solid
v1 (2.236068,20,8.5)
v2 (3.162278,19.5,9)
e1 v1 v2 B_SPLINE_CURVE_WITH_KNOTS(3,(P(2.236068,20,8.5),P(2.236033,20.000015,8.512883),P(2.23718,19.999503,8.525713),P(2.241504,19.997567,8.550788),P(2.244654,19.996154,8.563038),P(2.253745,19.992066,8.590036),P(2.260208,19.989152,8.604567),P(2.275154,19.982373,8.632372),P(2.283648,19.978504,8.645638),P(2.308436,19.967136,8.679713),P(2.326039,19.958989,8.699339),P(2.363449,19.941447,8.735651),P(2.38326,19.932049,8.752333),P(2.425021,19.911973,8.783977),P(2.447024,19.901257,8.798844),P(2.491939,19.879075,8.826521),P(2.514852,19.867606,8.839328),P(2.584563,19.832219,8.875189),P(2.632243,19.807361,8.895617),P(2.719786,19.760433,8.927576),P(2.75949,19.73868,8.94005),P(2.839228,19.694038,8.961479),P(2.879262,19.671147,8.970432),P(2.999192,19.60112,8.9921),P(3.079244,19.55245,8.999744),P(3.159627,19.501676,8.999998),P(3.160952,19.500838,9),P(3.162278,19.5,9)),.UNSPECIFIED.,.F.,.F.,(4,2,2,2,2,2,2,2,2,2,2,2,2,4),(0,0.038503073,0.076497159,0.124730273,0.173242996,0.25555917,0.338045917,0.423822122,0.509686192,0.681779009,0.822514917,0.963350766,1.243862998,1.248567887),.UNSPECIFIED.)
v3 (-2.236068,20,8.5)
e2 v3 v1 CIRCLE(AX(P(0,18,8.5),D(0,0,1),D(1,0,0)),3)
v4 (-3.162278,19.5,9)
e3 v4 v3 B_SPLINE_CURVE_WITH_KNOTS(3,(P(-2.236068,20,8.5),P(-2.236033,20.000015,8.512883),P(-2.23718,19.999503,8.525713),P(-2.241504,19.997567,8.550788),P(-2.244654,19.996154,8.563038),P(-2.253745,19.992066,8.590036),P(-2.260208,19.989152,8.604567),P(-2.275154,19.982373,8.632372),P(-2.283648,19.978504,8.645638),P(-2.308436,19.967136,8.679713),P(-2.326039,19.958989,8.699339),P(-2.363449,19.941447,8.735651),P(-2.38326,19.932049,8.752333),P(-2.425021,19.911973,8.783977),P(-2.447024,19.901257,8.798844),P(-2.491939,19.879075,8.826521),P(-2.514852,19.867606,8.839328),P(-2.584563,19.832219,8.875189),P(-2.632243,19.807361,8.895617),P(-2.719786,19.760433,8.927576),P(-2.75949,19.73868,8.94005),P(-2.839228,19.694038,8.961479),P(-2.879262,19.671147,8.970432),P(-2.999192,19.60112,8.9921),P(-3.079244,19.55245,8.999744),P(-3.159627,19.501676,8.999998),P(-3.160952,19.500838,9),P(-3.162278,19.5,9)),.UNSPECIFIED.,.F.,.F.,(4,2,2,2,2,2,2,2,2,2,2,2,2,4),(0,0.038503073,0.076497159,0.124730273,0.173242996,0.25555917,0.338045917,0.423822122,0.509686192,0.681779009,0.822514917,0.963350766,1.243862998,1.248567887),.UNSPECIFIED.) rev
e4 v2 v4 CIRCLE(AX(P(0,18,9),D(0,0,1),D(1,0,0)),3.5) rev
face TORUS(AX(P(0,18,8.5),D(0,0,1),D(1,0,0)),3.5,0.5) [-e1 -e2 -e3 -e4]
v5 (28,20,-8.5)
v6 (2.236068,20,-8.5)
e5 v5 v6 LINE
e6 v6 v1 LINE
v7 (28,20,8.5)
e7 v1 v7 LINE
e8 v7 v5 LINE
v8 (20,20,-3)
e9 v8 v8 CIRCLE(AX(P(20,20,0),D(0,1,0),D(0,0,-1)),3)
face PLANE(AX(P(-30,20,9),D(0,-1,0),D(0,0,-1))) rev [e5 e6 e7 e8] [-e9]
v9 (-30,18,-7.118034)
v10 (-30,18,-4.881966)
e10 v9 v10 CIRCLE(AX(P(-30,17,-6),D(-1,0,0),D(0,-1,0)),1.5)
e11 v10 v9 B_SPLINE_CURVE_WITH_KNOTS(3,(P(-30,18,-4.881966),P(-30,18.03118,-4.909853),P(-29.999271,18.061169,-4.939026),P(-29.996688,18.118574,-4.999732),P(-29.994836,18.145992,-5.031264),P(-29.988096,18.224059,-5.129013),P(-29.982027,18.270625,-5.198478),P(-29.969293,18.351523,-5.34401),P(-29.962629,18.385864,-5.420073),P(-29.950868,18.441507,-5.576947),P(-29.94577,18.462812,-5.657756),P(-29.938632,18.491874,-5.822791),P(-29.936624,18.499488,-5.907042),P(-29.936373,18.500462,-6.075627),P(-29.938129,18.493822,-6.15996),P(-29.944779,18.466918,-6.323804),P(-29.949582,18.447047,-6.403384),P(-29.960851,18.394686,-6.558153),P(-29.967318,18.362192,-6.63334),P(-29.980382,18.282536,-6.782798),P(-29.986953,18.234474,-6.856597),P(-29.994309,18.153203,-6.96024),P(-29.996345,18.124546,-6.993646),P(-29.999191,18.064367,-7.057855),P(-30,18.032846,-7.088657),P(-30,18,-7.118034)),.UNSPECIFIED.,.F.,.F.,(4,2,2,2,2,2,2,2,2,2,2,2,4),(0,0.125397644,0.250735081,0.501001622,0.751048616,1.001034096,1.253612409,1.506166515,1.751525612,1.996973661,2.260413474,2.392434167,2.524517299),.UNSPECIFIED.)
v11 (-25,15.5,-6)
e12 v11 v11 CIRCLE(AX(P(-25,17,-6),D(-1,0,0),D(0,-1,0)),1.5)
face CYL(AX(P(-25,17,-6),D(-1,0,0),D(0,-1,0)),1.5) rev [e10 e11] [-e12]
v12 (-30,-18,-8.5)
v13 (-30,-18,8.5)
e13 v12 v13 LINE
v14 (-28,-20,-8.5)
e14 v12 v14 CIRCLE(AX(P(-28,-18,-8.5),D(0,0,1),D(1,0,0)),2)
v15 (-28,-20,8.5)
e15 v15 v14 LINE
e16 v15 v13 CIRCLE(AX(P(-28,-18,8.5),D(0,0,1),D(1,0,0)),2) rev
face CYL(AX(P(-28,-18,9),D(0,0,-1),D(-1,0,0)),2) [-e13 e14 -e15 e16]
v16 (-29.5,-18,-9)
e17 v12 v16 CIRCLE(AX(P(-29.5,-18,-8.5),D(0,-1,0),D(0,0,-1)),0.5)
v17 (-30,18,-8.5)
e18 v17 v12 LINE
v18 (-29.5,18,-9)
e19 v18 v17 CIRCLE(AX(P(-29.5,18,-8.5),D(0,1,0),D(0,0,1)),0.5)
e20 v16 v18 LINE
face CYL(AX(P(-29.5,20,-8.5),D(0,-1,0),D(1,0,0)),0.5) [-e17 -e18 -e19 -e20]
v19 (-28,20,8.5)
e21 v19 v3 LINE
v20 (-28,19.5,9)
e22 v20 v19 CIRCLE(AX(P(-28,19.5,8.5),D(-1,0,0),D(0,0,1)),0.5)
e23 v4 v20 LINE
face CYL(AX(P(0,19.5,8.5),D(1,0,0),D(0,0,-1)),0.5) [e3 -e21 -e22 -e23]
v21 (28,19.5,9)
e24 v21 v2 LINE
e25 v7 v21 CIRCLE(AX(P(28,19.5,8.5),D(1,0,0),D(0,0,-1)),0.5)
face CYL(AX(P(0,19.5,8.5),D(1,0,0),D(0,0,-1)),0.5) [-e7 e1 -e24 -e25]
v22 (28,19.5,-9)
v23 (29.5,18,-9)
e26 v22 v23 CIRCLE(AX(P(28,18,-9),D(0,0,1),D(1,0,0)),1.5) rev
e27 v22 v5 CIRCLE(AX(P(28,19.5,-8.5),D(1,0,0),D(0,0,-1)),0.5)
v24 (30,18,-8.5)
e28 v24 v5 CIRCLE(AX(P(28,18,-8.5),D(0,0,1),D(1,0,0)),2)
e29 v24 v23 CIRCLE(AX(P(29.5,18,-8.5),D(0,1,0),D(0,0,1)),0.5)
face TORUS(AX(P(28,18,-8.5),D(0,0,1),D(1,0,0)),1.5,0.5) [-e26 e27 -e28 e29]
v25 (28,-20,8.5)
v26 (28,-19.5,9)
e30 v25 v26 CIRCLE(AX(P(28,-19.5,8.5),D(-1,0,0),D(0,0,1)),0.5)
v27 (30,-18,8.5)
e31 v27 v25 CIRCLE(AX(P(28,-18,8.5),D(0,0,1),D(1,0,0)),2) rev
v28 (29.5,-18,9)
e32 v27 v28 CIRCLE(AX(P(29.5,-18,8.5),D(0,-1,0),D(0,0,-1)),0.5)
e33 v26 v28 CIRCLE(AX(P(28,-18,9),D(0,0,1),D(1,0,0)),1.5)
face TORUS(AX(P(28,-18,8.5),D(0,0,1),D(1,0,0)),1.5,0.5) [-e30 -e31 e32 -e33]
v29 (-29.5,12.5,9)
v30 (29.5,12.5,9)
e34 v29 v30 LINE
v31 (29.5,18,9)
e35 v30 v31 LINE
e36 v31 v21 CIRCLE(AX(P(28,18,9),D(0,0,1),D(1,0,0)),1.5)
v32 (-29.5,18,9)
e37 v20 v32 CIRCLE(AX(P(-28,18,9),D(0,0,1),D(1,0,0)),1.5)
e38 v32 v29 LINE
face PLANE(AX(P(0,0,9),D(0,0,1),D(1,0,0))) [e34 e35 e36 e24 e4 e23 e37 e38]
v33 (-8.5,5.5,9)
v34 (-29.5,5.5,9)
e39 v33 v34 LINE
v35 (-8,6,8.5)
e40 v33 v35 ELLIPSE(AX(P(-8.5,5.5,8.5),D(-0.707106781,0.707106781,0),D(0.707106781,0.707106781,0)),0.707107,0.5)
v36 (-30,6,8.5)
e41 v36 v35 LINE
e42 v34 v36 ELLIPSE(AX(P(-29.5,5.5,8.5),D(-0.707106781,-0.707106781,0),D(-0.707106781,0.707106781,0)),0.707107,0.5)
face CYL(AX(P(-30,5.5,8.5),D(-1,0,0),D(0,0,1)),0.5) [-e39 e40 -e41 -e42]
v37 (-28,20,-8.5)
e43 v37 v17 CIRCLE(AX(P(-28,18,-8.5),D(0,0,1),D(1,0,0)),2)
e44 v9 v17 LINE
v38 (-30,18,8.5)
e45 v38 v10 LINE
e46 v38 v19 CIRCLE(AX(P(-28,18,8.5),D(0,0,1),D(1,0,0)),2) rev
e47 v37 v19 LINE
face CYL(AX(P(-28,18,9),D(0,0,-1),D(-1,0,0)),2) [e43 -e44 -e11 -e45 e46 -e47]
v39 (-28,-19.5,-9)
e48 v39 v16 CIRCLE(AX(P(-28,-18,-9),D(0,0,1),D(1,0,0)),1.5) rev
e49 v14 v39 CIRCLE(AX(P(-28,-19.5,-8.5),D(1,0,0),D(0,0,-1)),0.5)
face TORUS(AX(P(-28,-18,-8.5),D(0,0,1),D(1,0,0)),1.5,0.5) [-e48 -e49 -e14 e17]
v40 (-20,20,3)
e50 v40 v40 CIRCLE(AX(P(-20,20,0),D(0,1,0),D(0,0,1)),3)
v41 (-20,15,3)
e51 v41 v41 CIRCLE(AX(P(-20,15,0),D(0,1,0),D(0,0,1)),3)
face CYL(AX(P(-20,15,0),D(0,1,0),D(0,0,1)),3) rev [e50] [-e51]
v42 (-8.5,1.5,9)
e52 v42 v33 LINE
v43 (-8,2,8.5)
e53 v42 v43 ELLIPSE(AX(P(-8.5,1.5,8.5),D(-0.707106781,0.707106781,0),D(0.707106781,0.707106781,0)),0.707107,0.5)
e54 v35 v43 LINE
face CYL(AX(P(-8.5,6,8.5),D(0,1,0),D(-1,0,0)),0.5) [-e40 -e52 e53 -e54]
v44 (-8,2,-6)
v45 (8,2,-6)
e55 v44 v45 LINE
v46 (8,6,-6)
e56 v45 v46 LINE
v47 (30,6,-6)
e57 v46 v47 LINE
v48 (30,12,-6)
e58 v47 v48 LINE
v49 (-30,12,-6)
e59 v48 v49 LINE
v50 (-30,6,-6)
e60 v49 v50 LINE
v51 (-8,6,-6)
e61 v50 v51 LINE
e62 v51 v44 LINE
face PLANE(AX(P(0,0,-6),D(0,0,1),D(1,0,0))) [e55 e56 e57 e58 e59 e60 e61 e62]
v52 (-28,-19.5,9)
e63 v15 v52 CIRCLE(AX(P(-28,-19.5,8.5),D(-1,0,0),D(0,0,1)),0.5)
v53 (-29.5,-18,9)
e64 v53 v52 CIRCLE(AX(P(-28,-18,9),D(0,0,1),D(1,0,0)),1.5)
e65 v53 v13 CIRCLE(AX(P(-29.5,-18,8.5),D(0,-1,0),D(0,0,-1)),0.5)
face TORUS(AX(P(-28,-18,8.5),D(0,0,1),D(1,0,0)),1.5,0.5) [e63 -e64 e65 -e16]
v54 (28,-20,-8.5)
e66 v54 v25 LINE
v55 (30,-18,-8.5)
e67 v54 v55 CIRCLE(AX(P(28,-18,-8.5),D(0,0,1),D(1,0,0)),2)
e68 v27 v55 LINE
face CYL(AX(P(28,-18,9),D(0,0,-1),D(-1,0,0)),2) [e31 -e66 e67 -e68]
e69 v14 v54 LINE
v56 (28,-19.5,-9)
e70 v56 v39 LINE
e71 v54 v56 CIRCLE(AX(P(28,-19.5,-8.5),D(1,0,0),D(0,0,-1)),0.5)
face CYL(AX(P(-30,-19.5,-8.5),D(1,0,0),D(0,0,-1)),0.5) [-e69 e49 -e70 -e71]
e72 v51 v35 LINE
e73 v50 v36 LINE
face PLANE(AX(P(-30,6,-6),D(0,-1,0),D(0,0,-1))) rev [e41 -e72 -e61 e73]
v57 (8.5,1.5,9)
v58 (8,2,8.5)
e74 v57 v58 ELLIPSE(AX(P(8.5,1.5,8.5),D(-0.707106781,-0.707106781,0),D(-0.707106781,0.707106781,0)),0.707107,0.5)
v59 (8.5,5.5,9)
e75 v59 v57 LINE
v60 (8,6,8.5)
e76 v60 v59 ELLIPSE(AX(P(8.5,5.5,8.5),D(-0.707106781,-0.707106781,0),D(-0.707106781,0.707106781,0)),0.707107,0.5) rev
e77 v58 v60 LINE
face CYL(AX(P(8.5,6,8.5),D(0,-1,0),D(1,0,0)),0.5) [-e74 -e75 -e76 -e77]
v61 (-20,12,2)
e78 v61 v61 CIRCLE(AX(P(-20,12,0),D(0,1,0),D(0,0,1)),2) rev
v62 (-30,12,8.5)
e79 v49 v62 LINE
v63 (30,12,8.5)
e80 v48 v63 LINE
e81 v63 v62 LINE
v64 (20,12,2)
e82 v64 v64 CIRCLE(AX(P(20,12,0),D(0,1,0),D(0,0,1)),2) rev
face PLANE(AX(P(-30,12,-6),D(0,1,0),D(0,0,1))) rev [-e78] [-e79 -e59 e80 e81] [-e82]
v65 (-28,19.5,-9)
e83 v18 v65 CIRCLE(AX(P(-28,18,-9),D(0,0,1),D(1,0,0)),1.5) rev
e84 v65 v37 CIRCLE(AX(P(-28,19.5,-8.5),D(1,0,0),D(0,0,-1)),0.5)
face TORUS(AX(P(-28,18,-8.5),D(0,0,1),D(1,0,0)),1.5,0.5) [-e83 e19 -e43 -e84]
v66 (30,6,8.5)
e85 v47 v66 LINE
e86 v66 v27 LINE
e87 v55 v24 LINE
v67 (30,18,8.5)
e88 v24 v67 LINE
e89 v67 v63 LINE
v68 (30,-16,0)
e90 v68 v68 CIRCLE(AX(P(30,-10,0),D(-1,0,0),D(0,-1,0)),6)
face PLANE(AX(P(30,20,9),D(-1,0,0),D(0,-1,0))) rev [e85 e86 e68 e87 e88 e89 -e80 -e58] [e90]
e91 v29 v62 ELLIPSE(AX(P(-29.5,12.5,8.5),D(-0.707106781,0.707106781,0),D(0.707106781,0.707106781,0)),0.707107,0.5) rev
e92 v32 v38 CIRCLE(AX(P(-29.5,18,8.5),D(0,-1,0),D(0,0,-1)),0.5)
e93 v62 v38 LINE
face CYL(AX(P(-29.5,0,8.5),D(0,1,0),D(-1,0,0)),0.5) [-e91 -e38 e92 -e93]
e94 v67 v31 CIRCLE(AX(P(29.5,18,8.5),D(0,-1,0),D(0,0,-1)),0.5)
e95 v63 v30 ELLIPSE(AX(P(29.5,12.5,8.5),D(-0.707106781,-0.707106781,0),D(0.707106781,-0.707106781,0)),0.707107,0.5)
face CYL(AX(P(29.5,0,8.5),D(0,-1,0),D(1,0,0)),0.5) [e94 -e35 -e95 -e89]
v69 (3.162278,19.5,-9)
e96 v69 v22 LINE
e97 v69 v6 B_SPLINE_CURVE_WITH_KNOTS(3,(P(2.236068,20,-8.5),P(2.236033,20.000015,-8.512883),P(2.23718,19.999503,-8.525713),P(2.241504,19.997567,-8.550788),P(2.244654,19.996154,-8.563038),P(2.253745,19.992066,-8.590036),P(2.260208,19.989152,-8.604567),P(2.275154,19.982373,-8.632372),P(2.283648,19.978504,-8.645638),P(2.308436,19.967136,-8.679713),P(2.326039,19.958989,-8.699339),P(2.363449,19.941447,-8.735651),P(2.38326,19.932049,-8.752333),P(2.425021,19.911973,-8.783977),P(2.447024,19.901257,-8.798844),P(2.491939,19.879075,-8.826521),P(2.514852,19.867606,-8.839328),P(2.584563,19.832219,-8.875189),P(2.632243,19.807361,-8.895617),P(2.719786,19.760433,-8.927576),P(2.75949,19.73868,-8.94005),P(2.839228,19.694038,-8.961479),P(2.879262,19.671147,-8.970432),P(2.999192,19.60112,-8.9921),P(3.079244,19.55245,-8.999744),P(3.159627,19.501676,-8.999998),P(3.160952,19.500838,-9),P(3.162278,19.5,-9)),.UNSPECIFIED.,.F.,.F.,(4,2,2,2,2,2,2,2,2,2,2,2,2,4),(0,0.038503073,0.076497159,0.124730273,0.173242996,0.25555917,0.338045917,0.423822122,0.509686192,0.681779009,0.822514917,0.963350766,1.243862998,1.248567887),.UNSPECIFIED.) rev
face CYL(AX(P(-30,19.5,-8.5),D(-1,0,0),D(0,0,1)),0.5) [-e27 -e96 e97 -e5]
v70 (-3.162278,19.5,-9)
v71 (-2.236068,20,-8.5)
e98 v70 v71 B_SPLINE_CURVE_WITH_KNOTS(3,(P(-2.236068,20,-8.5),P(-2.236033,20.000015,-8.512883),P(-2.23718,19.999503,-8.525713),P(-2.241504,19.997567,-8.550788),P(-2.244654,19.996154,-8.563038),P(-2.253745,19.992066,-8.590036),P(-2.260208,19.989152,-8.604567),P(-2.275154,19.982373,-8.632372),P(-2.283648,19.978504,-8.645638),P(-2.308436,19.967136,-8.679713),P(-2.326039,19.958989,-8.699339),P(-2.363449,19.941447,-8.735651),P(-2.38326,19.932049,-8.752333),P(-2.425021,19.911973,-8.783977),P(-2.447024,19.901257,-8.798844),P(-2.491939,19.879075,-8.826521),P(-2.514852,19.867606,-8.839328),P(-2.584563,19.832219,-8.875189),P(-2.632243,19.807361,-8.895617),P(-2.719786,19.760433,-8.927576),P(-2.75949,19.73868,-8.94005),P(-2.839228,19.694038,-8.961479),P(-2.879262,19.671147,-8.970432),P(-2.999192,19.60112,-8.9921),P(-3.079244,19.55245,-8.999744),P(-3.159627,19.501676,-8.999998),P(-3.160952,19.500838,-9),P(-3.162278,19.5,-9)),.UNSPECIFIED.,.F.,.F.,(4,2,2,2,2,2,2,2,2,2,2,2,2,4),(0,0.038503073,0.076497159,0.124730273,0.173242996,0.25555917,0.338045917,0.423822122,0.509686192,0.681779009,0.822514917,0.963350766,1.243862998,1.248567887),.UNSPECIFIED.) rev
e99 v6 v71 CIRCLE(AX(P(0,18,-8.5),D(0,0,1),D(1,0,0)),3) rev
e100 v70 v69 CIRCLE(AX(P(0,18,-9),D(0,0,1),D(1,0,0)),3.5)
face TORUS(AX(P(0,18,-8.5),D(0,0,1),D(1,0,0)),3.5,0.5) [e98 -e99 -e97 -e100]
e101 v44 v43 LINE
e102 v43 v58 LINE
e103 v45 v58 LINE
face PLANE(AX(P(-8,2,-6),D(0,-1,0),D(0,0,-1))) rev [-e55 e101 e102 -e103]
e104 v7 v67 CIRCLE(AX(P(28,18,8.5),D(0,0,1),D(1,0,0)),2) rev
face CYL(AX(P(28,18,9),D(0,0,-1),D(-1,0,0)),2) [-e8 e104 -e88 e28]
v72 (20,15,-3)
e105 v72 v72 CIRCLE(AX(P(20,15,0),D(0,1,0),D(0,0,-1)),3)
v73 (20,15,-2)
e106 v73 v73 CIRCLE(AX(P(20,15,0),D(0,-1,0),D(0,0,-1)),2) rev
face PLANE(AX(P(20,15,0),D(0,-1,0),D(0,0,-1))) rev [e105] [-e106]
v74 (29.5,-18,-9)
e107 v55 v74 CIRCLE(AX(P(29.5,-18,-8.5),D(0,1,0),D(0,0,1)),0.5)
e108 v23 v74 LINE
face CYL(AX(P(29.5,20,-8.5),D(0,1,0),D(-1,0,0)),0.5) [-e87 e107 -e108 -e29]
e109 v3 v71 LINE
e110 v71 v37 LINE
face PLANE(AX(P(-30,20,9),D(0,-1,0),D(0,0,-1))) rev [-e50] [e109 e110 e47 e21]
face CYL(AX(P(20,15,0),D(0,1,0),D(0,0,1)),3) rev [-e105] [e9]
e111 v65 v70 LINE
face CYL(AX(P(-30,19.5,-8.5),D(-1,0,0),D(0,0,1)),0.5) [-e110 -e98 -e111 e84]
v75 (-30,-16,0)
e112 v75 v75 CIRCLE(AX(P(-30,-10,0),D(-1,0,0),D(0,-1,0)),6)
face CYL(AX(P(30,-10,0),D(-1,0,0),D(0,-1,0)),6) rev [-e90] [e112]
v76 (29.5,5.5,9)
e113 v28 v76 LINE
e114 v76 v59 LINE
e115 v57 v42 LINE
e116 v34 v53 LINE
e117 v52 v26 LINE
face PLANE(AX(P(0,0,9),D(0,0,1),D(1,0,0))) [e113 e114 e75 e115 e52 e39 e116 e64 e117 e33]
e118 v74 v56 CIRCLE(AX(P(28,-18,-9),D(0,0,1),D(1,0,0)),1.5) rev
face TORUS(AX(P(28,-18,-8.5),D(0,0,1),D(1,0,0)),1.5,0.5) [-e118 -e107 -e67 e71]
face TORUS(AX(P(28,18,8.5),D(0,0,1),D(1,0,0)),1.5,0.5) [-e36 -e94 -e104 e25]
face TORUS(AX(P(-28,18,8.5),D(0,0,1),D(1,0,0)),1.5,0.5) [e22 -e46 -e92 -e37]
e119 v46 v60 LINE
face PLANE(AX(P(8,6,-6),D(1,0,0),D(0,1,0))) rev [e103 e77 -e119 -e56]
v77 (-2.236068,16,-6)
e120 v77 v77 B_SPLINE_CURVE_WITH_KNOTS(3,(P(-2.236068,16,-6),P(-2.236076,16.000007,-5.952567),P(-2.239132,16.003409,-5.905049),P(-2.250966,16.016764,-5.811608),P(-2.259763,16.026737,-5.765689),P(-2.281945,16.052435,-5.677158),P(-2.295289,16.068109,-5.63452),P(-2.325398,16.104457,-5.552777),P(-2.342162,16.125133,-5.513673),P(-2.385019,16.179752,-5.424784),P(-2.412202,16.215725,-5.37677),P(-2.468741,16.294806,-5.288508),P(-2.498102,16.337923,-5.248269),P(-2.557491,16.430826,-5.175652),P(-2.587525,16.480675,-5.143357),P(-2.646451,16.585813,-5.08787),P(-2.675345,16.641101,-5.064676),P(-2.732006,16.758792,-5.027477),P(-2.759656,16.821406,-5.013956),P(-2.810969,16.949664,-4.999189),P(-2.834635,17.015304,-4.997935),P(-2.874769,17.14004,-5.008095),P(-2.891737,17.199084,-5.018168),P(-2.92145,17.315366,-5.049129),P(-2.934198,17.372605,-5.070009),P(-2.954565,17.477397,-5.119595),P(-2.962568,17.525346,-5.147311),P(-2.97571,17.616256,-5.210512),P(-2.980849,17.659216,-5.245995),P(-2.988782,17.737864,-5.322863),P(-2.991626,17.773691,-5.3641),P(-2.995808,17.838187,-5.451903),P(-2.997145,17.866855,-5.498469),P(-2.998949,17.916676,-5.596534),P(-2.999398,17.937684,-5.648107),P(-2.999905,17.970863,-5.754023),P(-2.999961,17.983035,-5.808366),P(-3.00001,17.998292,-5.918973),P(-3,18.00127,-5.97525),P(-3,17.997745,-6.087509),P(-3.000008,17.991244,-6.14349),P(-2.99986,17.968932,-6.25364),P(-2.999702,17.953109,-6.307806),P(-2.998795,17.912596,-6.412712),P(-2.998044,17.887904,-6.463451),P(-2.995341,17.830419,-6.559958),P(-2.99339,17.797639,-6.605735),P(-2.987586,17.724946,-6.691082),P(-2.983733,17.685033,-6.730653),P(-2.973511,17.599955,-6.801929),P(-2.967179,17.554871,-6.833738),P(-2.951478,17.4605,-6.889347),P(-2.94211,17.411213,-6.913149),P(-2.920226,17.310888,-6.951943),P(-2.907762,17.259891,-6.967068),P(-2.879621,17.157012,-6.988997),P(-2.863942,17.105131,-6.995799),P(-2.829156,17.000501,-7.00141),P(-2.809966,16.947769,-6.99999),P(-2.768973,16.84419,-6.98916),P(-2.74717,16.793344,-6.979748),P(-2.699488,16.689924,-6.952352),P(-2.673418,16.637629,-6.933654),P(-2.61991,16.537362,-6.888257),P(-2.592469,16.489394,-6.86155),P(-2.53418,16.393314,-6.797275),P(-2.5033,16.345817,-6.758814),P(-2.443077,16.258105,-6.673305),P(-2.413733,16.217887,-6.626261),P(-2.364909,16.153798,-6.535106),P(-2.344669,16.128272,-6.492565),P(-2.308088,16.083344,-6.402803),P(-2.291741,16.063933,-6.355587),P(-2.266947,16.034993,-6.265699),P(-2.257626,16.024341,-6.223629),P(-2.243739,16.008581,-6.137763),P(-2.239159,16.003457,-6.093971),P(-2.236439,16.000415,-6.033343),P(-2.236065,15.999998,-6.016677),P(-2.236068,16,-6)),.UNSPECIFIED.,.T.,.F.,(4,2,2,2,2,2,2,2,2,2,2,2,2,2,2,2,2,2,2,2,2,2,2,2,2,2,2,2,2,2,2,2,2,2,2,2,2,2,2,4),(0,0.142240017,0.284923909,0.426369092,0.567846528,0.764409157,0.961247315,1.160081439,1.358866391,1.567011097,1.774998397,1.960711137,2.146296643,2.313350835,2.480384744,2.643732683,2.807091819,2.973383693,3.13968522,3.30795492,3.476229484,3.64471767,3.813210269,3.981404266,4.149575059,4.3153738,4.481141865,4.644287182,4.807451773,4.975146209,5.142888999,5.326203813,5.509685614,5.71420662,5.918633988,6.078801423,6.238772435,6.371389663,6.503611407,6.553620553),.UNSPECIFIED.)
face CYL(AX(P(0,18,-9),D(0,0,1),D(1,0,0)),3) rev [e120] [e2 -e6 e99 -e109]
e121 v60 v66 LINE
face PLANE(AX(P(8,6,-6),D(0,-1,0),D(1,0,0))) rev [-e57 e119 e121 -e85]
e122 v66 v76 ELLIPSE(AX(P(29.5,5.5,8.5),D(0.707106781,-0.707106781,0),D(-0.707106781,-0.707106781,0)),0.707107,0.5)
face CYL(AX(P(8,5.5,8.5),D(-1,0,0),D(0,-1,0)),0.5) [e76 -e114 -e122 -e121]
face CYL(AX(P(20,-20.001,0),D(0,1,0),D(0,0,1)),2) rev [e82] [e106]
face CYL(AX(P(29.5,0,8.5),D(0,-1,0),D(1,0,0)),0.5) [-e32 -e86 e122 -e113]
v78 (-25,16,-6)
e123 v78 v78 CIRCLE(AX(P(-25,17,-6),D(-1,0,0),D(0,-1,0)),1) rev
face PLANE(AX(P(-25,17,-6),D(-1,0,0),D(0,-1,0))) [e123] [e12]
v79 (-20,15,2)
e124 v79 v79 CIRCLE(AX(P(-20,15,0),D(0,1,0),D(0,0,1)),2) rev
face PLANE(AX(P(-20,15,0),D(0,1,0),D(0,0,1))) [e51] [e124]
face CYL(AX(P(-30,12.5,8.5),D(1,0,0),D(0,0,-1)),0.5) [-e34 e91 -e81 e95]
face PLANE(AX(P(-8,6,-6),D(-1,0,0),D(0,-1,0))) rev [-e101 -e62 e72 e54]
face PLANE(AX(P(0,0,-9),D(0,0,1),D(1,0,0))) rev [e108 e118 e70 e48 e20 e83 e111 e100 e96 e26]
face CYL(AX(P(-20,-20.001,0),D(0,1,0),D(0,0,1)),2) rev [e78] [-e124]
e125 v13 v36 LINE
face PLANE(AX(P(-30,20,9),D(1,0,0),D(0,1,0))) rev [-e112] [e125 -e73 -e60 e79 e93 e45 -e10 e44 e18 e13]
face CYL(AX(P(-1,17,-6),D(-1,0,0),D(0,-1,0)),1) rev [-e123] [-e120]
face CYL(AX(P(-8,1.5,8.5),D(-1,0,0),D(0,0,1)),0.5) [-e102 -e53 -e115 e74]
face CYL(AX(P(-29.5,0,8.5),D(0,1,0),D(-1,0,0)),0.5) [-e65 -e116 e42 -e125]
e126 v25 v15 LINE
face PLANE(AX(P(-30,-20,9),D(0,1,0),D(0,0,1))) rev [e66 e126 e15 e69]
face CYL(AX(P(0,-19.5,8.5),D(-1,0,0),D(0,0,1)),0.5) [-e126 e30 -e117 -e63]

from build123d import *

# Parameters (mm, degrees)
SKETCH1_W           = 60
SKETCH1_H           = 40
BOSS_EXTRUDE1_DEPTH = 9
SKETCH2_R           = 6
CUT_EXTRUDE1_DEPTH  = 64.882705015
SKETCH3_R           = 3
CUT_EXTRUDE2_DEPTH  = 41.298883359
CUT_EXTRUDE3_DEPTH  = 15
SKETCH5_R           = 1
CUT_EXTRUDE4_DEPTH  = 29
SKETCH6_R           = 1.5
CUT_EXTRUDE5_DEPTH  = 5
CUT_EXTRUDE6_REACH  = 52.804
SKETCH7_R           = 2
SKETCH8_R           = 3
CUT_EXTRUDE7_DEPTH  = 5
FILLET1_R           = 2
FILLET2_R           = 0.5


with BuildPart() as part:
    # Sketch1 → Boss-Extrude1 (new, symmetric)
    with BuildSketch(Plane.XY):
        Rectangle(SKETCH1_W, SKETCH1_H)
    extrude(amount=BOSS_EXTRUDE1_DEPTH, both=True)

    # Sketch2 → Cut-Extrude1 (cut, through all)
    with BuildSketch(Plane.ZY.offset(30)):
        with Locations(Location((0, -10, 0), (0, 0, 270))):
            Circle(SKETCH2_R)
    extrude(amount=-CUT_EXTRUDE1_DEPTH, mode=Mode.SUBTRACT)

    # Sketch3 → Cut-Extrude2 (cut, through all)
    with BuildSketch(Plane.XY.offset(9)):
        with Locations((0, 18)):
            Circle(SKETCH3_R)
    extrude(amount=-CUT_EXTRUDE2_DEPTH, mode=Mode.SUBTRACT)

    # Sketch4 → Cut-Extrude3 (cut)
    with BuildSketch(Plane.XY.offset(9)):
        Polygon((-30, 12), (30, 12), (30, 6), (8, 6), (8, 2), (-8, 2), (-8, 6), (-30, 6), align=None)
    extrude(amount=-CUT_EXTRUDE3_DEPTH, mode=Mode.SUBTRACT)

    # Sketch5 → Cut-Extrude4 (cut)
    with BuildSketch(Plane.ZY.offset(30)):
        with Locations(Location((-6, 17, 0), (0, 0, 270))):
            Circle(SKETCH5_R)
    extrude(amount=-CUT_EXTRUDE4_DEPTH, mode=Mode.SUBTRACT)

    # Sketch6 → Cut-Extrude5 (cut)
    with BuildSketch(Plane.ZY.offset(30)):
        with Locations(Location((-6, 17, 0), (0, 0, 270))):
            Circle(SKETCH6_R)
    extrude(amount=-CUT_EXTRUDE5_DEPTH, mode=Mode.SUBTRACT)

    # Sketch7 → Cut-Extrude6 (cut, up to next)
    with BuildSketch(Plane(origin=(0, 20, 0), x_dir=(1, 0, 0), z_dir=(0, 1, 0)), mode=Mode.PRIVATE) as cut_extrude6_sk1:
        with Locations(Location((-20, 0, 0), (0, 0, 270))):
            Circle(SKETCH7_R)
    cut_extrude6_tool1 = extrude(cut_extrude6_sk1.sketch, amount=-CUT_EXTRUDE6_REACH, mode=Mode.PRIVATE) & part.part
    # Sketch7 → Cut-Extrude6 (cut, up to next)
    with BuildSketch(Plane(origin=(0, 20, 0), x_dir=(1, 0, 0), z_dir=(0, 1, 0)), mode=Mode.PRIVATE) as cut_extrude6_sk2:
        with Locations(Location((20, 0, 0), (0, 0, 270))):
            Circle(SKETCH7_R)
    cut_extrude6_tool2 = extrude(cut_extrude6_sk2.sketch, amount=-CUT_EXTRUDE6_REACH, mode=Mode.PRIVATE) & part.part
    add(cut_extrude6_tool1.solids().sort_by_distance((-20, 20, 0))[0], mode=Mode.SUBTRACT)
    add(cut_extrude6_tool2.solids().sort_by_distance((20, 20, 0))[0], mode=Mode.SUBTRACT)

    # Sketch8 → Cut-Extrude7 (cut)
    with BuildSketch(Plane(origin=(0, 20, 0), x_dir=(1, 0, 0), z_dir=(0, 1, 0))):
        with Locations(Location((-20, 0, 0), (0, 0, 270))):
            Circle(SKETCH8_R)
        with Locations(Location((20, 0, 0), (0, 0, 90))):
            Circle(SKETCH8_R)
    extrude(amount=-CUT_EXTRUDE7_DEPTH, mode=Mode.SUBTRACT)

    # Fillet1
    # the kernel refuses this fillet: 2 mm, written as the material it takes off along each edge
    with BuildSketch(Plane(origin=(30, -20, 14), x_dir=(-1, 0, 0), z_dir=(0, 0, -1))) as fillet1_piece_1:
        with BuildLine():
            CenterArc((FILLET1_R, FILLET1_R), FILLET1_R, 180, 90)
            Line((0, FILLET1_R), (0, 0))
            Line((0, 0), (FILLET1_R, 0))
        make_face()
    extrude(amount=28, mode=Mode.SUBTRACT)
    with BuildSketch(Plane(origin=(-30, -20, -14), x_dir=(0, 1, 0), z_dir=(0, 0, 1)), Plane(origin=(-30, 20, -14), x_dir=(1, 0, 0), z_dir=(0, 0, 1)), Plane(origin=(30, 20, 14), x_dir=(-1, 0, 0), z_dir=(0, 0, -1))) as fillet1_piece_2:
        with BuildLine():
            CenterArc((FILLET1_R, -FILLET1_R), FILLET1_R, 90, 90)
            Line((0, -FILLET1_R), (0, 0))
            Line((0, 0), (FILLET1_R, 0))
        make_face()
    extrude(amount=28, mode=Mode.SUBTRACT)

    # Fillet2
    fillet2_edges = [part.edges().sort_by_distance(p)[0] for p in [
        (29.414213562, -19.414213562, 9),
        (15.118033989, 20, 9),
        (-30, 15, 9),
        (-29.414213562, 19.414213562, 9),
        (29.414213562, 19.414213562, 9),
        (-15.118033989, 20, -9),
        (0, 15, -9),
        (-15.118033989, 20, 9),
        (0, 15, 9),
        (-30, -6, 9),
        (30, 15, 9),
        (-19, 6, 9),
        (-8, 4, 9),
        (0, 2, 9),
        (8, 4, 9),
        (19, 6, 9),
        (0, 12, 9),
        (30, -6, 9),
        (30, 0, -9),
        (15.118033989, 20, -9),
        (0, -20, -9),
        (-30, 0, -9),
        (-29.414213562, 19.414213562, -9),
        (-29.414213562, -19.414213562, -9),
        (29.414213562, 19.414213562, -9),
        (29.414213562, -19.414213562, -9),
        (0, -20, 9),
        (-29.414213562, -19.414213562, 9),
    ]]
    fillet(fillet2_edges, radius=FILLET2_R)


solid = part.part
